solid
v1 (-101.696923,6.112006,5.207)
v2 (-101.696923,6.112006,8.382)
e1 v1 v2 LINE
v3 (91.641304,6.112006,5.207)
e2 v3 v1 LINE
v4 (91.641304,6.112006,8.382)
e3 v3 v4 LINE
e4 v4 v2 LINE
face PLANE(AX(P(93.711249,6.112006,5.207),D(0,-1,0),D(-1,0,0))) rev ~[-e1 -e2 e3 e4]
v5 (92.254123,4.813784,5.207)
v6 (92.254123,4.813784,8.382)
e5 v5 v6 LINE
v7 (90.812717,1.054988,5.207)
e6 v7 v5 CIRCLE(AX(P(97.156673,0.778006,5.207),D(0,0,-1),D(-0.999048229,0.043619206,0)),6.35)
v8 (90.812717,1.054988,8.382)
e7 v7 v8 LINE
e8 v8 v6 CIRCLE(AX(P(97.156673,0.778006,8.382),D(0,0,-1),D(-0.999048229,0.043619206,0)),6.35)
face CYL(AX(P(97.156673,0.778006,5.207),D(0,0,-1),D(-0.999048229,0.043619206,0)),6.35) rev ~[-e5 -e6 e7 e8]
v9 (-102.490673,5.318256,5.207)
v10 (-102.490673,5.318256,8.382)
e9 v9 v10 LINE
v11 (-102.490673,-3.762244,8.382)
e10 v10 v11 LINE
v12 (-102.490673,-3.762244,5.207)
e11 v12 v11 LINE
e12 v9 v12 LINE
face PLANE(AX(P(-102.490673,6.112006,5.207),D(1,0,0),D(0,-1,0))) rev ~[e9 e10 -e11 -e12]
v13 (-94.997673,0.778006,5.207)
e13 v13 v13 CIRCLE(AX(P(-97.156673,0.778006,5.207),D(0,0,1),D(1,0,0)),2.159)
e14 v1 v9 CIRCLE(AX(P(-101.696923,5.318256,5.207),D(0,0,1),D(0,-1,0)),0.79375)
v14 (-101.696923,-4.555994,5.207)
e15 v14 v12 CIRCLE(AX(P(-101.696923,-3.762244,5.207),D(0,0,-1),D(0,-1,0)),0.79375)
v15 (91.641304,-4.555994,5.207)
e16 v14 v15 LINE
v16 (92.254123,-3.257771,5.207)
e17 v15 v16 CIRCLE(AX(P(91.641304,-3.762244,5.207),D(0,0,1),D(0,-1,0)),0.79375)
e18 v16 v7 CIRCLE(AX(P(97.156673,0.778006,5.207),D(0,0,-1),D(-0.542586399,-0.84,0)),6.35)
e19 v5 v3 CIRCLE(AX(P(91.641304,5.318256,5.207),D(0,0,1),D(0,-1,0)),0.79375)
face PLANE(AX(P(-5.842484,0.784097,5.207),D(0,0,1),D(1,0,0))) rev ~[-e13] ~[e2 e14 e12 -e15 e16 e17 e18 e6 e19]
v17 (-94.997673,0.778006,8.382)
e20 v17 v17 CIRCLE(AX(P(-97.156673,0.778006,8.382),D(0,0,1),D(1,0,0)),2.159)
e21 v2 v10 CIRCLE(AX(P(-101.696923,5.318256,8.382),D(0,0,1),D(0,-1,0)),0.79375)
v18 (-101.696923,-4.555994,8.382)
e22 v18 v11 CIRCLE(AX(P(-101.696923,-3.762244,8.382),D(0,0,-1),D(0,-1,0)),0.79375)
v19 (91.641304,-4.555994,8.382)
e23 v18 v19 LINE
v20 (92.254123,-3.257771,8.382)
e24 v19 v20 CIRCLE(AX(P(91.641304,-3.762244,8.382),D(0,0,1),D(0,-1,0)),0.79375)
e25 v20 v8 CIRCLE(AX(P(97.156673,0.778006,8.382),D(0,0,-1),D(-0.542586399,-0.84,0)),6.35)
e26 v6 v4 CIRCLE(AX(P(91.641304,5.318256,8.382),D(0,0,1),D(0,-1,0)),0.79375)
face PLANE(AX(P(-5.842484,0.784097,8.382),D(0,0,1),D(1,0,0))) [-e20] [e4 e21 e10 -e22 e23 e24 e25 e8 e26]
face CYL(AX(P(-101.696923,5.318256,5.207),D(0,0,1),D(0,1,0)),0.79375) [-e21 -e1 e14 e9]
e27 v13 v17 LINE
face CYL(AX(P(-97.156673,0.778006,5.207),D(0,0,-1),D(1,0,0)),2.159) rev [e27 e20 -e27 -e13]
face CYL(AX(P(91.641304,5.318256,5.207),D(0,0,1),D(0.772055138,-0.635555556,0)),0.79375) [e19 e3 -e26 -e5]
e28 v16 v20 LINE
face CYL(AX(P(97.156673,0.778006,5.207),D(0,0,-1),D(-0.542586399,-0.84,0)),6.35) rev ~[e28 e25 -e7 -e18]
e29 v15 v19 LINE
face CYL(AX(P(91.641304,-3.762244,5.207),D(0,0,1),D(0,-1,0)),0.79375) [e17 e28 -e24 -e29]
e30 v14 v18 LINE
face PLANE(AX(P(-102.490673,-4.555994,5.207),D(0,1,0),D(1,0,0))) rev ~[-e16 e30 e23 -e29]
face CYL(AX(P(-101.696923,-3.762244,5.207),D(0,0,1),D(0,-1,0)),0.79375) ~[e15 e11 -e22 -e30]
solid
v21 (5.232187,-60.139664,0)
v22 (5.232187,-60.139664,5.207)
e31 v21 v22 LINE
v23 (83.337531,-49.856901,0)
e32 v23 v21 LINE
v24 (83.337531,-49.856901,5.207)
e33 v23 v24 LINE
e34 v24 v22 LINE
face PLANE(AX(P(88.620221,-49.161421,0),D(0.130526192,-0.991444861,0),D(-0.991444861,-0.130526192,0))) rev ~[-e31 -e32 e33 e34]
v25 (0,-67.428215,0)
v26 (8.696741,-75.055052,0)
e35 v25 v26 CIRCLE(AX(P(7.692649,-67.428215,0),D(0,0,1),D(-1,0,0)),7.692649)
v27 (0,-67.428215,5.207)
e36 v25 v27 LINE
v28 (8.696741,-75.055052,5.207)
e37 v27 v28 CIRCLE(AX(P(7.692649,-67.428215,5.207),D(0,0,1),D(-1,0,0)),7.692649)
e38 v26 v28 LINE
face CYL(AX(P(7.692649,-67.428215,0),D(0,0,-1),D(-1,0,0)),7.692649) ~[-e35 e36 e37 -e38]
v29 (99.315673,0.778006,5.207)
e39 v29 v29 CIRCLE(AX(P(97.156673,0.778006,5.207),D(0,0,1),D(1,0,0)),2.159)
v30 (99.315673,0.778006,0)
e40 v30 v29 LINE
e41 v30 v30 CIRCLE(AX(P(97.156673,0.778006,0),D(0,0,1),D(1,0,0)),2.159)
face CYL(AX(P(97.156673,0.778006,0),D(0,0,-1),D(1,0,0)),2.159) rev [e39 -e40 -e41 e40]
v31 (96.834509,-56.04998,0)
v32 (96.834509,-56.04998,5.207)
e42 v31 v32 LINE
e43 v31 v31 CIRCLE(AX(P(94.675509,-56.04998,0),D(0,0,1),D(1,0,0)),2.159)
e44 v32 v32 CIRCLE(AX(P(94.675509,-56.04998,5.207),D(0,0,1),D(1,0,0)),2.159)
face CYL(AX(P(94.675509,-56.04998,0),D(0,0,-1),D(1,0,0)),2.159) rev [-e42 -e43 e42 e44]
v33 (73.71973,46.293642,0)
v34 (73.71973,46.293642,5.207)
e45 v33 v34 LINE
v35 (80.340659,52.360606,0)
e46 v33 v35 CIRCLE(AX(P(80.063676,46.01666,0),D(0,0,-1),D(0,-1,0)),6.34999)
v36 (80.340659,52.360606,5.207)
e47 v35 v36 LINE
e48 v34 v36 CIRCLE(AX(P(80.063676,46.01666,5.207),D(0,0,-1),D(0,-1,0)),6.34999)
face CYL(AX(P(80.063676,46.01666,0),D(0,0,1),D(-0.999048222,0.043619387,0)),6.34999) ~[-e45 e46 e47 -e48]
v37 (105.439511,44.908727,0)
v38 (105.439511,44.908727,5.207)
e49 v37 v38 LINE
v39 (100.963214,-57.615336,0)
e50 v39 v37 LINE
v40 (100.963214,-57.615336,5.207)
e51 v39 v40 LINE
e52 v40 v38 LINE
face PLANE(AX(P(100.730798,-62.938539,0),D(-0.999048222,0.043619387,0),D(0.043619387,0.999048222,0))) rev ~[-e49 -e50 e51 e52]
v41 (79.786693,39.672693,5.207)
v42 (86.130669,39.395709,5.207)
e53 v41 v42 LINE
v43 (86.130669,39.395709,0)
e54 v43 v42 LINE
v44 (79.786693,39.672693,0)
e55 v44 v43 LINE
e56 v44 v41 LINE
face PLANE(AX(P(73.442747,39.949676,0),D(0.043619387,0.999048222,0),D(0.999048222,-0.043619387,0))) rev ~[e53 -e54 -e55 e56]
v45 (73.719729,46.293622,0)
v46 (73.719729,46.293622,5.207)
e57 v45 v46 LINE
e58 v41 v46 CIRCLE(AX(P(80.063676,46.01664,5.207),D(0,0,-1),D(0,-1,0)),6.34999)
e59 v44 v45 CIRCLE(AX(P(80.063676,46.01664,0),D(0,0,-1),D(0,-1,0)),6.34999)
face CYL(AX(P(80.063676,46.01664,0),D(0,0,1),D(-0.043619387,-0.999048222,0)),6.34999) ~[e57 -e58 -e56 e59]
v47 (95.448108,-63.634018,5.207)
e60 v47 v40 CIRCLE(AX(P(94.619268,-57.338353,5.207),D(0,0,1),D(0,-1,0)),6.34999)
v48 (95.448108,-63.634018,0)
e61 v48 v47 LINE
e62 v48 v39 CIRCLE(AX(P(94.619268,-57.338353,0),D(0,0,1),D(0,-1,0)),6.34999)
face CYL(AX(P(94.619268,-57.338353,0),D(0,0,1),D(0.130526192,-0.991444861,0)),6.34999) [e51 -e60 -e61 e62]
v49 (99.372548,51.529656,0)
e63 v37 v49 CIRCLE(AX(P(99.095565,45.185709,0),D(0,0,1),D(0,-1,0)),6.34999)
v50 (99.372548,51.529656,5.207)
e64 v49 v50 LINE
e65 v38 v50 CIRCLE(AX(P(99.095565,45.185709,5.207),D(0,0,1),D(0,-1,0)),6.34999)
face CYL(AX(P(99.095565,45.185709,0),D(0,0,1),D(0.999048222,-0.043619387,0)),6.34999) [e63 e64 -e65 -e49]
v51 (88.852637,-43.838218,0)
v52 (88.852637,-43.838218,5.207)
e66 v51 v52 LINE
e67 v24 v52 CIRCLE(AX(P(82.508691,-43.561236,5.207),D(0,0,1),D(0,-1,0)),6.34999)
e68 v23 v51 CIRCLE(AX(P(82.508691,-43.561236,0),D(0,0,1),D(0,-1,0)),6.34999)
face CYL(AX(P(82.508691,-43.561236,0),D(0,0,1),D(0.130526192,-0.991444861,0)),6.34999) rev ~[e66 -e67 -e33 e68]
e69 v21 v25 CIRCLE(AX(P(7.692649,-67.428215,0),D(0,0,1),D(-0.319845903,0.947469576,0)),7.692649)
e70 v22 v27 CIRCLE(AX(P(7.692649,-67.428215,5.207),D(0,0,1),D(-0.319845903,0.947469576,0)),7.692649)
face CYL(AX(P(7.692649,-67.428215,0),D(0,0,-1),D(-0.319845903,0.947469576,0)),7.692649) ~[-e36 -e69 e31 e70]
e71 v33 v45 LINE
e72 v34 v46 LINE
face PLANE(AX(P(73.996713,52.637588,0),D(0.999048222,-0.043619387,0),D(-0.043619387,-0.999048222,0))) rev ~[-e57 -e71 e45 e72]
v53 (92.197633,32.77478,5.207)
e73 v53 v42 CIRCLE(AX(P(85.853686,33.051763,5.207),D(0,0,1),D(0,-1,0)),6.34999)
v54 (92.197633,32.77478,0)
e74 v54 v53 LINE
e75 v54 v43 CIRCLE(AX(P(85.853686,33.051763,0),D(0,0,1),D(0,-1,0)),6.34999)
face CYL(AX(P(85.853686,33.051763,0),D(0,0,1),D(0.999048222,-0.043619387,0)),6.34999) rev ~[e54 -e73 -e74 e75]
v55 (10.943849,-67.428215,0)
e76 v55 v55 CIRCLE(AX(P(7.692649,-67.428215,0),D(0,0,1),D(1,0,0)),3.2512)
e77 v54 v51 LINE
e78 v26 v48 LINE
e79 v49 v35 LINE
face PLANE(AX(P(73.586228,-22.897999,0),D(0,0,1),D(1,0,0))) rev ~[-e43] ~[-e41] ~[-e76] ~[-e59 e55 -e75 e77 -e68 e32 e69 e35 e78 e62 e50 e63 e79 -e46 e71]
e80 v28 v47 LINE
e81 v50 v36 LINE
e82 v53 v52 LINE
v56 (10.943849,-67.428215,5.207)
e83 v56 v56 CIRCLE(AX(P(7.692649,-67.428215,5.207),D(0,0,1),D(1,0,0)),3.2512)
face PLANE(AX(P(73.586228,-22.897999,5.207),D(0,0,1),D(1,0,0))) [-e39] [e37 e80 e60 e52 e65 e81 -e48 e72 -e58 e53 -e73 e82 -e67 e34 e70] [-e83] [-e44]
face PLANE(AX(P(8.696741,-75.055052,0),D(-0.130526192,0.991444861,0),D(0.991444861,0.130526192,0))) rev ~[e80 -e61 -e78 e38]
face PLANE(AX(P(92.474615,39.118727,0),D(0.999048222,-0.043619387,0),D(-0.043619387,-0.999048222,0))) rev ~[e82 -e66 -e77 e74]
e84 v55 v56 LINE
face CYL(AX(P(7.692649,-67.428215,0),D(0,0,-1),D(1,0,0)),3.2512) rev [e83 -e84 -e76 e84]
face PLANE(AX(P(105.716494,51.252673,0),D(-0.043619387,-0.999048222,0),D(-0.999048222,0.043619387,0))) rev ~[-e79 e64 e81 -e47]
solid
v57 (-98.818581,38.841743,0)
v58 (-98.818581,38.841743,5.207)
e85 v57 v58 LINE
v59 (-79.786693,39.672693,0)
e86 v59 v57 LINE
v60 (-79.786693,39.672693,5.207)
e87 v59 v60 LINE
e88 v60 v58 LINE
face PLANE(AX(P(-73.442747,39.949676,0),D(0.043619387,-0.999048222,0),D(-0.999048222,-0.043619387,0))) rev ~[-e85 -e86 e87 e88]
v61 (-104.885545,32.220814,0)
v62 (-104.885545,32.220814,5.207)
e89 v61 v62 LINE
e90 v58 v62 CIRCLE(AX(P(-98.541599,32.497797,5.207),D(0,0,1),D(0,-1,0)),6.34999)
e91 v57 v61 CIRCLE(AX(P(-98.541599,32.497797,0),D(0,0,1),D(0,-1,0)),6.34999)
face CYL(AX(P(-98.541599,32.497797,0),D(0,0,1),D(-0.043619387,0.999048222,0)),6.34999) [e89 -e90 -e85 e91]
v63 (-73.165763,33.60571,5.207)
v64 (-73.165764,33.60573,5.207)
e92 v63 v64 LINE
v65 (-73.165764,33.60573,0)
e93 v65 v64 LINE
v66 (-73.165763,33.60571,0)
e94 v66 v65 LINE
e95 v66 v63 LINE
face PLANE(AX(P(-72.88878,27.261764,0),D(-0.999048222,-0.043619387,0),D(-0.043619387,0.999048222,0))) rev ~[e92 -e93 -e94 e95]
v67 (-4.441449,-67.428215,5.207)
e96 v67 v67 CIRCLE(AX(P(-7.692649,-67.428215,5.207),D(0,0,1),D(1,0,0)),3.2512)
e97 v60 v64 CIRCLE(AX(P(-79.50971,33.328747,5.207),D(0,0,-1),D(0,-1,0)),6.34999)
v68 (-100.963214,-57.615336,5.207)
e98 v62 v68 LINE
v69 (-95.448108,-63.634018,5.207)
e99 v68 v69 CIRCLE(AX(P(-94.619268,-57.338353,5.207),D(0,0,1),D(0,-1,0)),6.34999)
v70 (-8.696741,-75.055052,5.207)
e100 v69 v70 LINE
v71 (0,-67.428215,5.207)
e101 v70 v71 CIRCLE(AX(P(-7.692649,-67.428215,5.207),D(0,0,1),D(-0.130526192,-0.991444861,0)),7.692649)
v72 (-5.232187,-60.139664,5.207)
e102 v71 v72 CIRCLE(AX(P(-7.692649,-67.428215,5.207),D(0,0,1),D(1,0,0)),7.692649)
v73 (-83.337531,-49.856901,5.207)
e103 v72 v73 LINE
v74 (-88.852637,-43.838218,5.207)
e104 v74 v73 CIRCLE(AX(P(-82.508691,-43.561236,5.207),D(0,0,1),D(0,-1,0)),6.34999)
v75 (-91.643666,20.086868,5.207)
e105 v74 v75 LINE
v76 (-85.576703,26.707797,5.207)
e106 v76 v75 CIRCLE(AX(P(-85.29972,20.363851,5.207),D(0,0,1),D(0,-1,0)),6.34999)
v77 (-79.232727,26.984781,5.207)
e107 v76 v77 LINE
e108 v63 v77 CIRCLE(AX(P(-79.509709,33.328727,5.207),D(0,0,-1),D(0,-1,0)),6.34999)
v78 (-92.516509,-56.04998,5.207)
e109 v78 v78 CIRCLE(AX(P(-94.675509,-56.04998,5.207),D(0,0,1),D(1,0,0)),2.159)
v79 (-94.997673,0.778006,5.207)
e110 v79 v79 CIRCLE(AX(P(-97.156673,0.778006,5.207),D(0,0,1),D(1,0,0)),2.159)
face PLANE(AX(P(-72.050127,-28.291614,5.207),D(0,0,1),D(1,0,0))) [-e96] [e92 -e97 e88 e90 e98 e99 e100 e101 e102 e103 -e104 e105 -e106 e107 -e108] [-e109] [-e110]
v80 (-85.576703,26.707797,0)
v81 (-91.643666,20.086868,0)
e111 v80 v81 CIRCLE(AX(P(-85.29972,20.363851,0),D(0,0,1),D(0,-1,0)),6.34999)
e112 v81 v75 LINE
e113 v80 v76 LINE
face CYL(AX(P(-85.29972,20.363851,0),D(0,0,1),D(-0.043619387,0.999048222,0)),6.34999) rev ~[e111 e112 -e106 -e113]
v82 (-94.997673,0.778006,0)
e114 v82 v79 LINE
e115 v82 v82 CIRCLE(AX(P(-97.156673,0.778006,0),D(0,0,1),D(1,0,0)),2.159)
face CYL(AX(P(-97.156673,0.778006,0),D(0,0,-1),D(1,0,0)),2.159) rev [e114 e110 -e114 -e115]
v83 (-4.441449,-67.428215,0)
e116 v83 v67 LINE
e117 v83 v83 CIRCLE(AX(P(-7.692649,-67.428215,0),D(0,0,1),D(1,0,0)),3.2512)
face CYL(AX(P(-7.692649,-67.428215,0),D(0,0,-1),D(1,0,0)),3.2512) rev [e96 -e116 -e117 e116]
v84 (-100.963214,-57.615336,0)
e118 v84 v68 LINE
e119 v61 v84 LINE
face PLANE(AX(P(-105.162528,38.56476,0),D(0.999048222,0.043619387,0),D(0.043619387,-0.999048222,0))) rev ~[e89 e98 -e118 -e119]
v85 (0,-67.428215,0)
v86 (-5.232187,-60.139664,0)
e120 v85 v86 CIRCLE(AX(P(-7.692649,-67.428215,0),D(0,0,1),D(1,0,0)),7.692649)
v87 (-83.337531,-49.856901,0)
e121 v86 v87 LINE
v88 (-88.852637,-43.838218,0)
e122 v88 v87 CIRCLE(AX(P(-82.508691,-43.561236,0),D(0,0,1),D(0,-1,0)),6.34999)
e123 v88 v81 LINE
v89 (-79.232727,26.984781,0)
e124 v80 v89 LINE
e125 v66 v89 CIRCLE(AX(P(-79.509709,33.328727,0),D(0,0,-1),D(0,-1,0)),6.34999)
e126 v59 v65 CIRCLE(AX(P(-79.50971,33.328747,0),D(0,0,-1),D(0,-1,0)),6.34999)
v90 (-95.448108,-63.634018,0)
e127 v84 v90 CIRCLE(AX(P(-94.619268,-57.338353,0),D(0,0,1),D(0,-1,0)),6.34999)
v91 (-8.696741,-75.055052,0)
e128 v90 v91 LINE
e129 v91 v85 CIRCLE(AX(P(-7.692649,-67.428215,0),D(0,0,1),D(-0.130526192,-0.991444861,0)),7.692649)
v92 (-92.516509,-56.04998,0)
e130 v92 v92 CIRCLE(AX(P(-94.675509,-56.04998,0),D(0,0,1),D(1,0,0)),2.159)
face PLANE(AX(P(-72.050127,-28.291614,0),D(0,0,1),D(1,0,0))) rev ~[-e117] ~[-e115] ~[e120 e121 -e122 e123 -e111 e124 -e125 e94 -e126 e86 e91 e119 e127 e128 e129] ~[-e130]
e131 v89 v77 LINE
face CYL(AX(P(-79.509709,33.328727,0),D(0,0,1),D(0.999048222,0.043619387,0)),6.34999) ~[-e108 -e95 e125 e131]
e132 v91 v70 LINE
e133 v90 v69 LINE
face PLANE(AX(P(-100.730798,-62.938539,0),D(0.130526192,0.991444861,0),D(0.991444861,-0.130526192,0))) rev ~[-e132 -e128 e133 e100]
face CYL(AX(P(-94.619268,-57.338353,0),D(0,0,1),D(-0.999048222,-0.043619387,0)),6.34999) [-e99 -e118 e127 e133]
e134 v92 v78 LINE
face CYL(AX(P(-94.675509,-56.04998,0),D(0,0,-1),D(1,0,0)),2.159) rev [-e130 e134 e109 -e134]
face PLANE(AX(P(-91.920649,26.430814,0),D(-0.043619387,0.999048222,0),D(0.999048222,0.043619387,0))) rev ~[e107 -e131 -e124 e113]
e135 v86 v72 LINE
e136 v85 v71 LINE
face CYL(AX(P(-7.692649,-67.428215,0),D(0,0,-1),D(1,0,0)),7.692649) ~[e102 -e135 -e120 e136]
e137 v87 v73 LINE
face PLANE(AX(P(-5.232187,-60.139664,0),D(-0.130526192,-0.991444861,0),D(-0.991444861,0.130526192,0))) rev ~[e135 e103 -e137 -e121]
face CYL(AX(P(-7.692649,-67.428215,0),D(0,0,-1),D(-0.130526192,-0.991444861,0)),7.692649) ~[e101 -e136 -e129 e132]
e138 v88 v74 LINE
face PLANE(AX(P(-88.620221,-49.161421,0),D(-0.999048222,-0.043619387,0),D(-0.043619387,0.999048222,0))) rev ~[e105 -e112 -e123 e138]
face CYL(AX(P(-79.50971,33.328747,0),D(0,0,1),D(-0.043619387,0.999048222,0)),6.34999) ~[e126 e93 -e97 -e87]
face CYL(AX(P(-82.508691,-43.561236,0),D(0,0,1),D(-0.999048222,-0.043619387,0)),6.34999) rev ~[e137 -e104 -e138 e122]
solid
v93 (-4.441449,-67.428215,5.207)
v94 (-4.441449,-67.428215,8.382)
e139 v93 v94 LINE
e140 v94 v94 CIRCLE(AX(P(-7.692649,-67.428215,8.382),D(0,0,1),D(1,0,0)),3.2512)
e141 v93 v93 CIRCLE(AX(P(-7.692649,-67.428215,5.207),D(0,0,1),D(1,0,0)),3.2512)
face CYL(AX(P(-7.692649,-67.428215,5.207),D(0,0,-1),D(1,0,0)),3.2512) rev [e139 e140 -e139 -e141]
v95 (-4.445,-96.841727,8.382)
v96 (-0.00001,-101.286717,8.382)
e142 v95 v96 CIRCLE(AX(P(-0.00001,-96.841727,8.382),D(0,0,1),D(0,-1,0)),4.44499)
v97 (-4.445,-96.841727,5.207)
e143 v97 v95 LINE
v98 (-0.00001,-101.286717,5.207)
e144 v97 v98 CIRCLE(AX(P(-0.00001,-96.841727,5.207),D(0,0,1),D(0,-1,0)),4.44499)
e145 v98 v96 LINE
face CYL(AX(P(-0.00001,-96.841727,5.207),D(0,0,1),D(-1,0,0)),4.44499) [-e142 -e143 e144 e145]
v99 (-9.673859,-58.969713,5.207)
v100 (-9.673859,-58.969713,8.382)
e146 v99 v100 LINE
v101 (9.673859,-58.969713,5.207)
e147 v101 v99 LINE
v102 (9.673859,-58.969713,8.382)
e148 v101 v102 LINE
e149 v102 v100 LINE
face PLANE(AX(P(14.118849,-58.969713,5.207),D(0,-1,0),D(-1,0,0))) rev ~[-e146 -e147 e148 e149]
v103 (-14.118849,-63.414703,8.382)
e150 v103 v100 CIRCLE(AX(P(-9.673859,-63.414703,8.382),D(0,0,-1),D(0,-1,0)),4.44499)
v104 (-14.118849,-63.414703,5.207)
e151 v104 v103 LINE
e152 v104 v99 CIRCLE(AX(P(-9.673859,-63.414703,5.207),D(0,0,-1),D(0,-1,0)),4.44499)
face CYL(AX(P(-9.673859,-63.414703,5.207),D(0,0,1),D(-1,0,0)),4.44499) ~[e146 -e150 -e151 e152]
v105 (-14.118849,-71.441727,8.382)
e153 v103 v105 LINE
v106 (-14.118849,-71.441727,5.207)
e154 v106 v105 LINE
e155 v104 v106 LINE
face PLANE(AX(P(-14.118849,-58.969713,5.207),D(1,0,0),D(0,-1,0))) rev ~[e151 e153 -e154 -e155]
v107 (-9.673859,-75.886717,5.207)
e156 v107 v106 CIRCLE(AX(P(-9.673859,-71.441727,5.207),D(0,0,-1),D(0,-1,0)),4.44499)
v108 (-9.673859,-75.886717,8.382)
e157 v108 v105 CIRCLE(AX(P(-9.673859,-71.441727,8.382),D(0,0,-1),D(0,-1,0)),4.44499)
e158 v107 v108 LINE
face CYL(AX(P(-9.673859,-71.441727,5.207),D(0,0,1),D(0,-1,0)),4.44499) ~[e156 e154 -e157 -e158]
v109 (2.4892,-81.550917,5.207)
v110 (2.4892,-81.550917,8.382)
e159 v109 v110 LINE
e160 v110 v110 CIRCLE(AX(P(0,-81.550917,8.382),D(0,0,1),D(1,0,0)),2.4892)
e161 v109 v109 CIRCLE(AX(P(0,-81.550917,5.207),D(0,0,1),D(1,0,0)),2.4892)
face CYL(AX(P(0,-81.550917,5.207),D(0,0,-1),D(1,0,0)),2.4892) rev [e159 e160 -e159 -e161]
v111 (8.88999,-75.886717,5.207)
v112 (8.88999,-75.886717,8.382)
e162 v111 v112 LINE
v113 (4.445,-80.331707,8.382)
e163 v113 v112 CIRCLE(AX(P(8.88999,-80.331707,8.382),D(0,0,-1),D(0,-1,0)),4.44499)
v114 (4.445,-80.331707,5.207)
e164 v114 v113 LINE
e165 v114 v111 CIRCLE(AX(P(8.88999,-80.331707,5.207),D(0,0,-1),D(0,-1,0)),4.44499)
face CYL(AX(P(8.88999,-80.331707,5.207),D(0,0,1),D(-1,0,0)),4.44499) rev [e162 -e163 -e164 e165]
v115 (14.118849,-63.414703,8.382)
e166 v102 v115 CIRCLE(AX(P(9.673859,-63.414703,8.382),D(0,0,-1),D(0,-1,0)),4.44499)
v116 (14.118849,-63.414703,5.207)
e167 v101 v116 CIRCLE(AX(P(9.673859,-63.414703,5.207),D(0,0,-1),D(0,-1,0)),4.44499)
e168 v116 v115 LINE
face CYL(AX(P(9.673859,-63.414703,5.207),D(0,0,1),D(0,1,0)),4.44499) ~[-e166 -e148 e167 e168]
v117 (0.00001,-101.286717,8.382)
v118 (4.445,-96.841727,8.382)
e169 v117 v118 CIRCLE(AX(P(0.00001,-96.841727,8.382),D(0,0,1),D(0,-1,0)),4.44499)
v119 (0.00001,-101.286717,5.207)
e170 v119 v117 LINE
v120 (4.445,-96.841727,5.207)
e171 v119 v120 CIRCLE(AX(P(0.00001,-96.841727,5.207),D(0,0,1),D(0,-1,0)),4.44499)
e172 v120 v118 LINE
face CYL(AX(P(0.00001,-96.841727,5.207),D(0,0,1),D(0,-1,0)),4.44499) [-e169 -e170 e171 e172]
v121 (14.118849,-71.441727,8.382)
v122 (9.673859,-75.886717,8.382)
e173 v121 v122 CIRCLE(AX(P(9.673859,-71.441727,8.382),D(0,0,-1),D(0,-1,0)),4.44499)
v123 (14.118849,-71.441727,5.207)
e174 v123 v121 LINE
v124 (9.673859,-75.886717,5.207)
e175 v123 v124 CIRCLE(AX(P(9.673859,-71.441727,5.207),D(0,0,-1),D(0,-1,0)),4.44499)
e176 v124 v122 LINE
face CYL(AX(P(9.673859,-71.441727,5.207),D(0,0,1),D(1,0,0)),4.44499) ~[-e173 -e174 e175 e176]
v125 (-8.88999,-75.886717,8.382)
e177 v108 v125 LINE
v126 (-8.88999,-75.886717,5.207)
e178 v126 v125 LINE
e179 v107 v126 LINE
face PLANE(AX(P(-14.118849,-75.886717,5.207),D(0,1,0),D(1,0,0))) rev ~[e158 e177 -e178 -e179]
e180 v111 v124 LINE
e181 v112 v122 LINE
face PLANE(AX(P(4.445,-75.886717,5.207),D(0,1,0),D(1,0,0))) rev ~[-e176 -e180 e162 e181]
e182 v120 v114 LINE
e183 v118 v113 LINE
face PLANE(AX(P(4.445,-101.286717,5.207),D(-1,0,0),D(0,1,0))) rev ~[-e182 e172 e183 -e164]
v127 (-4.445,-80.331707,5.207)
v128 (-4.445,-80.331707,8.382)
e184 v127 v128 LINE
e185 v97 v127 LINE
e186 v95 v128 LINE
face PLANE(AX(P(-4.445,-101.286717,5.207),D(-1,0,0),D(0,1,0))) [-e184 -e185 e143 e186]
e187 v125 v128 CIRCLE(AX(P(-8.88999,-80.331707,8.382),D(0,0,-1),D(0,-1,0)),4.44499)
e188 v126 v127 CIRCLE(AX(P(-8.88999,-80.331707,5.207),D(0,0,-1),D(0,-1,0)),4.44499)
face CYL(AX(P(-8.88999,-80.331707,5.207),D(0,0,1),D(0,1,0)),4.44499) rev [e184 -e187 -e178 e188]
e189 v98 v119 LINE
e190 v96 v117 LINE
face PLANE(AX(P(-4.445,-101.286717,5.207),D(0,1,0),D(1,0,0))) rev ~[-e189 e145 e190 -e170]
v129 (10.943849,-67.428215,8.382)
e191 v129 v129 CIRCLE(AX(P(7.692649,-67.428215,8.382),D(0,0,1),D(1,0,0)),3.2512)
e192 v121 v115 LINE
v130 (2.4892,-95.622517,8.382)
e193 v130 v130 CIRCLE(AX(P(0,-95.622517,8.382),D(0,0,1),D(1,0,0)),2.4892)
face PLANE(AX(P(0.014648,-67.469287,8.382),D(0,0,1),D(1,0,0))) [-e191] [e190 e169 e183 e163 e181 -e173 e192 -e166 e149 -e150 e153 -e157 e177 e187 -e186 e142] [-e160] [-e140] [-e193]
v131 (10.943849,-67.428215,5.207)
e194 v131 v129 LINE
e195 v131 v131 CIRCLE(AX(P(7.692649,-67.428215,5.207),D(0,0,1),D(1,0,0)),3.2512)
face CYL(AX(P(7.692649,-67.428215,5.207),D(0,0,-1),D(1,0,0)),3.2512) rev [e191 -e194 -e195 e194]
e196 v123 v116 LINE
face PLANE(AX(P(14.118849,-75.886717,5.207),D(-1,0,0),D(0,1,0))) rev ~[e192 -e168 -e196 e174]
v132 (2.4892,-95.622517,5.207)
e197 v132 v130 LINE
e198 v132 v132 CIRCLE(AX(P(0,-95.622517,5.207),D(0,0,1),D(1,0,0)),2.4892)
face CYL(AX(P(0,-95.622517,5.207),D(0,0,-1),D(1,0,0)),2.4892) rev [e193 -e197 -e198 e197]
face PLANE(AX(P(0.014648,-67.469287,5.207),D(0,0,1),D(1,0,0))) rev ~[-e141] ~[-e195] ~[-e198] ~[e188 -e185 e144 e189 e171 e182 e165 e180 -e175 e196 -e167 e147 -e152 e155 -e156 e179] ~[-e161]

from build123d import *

# Parameters (mm, degrees)
F0_R     = 3.2512
F0_R_2   = 2.159
F1_DEPTH = 5.207
F2_R     = 3.2512
F2_W     = 8.89
F2_H     = 25.4
F2_R_2   = 2.4892
F3_DEPTH = 3.175
F4_R     = 4.44499
F5_R     = 2.159
F6_DEPTH = 3.175
F7_R     = 0.79375
F8_R     = 6.34999
F8_2_R   = 6.34999


# Not quite as in the source:
# - a fillet or chamfer is up to 0.001 mm smaller than in the source, because OpenCascade refuses the exact size


with BuildPart() as f1:
    # F0 (on Top) → F1 (new body)
    with BuildSketch(Plane.XY):
        with BuildLine():
            ThreePointArc((5.2321866987, -60.139664194), (1.4434761951, -62.9421602277), (0, -67.4282150393))
            ThreePointArc((0, -67.4282150393), (2.6205330591, -73.2118547441), (8.6967411267, -75.0550523098))
            Line((8.6967411267, -75.0550523098), (100.7307979156, -62.9385388704))
            Line((100.7307979156, -62.9385388704), (105.7164938914, 51.2526728564))
            Line((105.7164938914, 51.2526728564), (73.9967128562, 52.6375884052))
            Line((73.9967128562, 52.6375884052), (73.4427466367, 39.9496759911))
            Line((73.4427466367, 39.9496759911), (92.4746152578, 39.1187266618))
            Line((92.4746152578, 39.1187266618), (88.6202207603, -49.1614212409))
            Line((88.6202207603, -49.1614212409), (5.2321866987, -60.139664194))
        make_face()
        with Locations((7.6926489511, -67.4282150369)):
            Circle(F0_R, mode=Mode.SUBTRACT)
        with Locations((94.6755093379, -56.0499800557)):
            Circle(F0_R_2, mode=Mode.SUBTRACT)
        with Locations((97.1566728062, 0.7780063098)):
            Circle(F0_R_2, mode=Mode.SUBTRACT)
    extrude(amount=F1_DEPTH)

    # F8 (radius 6.35 in the source; OpenCascade refuses exactly that, so slightly less here)
    f8_edges = [f1.edges().sort_by_distance(p)[0] for p in [
        (92.474615, 39.118727, 2.6035),
        (73.442747, 39.949676, 2.6035),
        (73.996713, 52.637588, 2.6035),
        (105.716494, 51.252673, 2.6035),
        (100.730798, -62.938539, 2.6035),
        (88.620221, -49.161421, 2.6035),
    ]]
    fillet(f8_edges, radius=F8_R)


with BuildPart() as f1b:
    # F0 (on Top) → F1, piece 2 (new body)
    with BuildSketch(Plane.XY):
        with BuildLine():
            Line((-73.4427466367, 39.9496759911), (-105.1625276719, 38.5647604423))
            Line((-105.1625276719, 38.5647604423), (-100.7307979156, -62.9385388704))
            Line((-100.7307979156, -62.9385388704), (-8.6967411267, -75.0550523098))
            ThreePointArc((-8.6967411267, -75.0550523098), (-2.6205330591, -73.2118547441), (0, -67.4282150393))
            ThreePointArc((0, -67.4282150393), (-1.4434761951, -62.9421602277), (-5.2321866987, -60.139664194))
            Line((-5.2321866987, -60.139664194), (-88.6202207603, -49.1614212409))
            Line((-88.6202207603, -49.1614212409), (-91.9206490383, 26.4308142477))
            Line((-91.9206490383, 26.4308142477), (-72.8887804171, 27.261763577))
            Line((-72.8887804171, 27.261763577), (-73.4427466367, 39.9496759911))
        make_face()
        with Locations((-94.6755093379, -56.0499800557)):
            Circle(F0_R_2, mode=Mode.SUBTRACT)
        with Locations((-7.6926489511, -67.4282150369)):
            Circle(F0_R, mode=Mode.SUBTRACT)
        with Locations((-97.1566728062, 0.7780063098)):
            Circle(F0_R_2, mode=Mode.SUBTRACT)
    extrude(amount=F1_DEPTH)

    # F8#2 (radius 6.35 in the source; OpenCascade refuses exactly that, so slightly less here)
    f8_2_edges = [f1b.edges().sort_by_distance(p)[0] for p in [
        (-73.442747, 39.949676, 2.6035),
        (-72.88878, 27.261764, 2.6035),
        (-105.162528, 38.56476, 2.6035),
        (-91.920649, 26.430814, 2.6035),
        (-100.730798, -62.938539, 2.6035),
        (-88.620221, -49.161421, 2.6035),
    ]]
    fillet(f8_2_edges, radius=F8_2_R)


with BuildPart() as f3:
    # F2 (on face) → F3 (new body)
    with BuildSketch(Plane.XY.offset(5.207)):
        with BuildLine():
            Line((-14.1188489511, -75.8867171605), (-4.445, -75.8867171605))
            Line((-4.445, -75.8867171605), (4.445, -75.8867171605))
            Line((4.445, -75.8867171605), (14.1188489511, -75.8867171605))
            Line((14.1188489511, -75.8867171605), (14.1188489511, -58.9697129133))
            Line((14.1188489511, -58.9697129133), (-14.1188489511, -58.9697129133))
            Line((-14.1188489511, -58.9697129133), (-5.2321866987, -60.139664194))
            ThreePointArc((-5.2321866987, -60.139664194), (-0.1994884623, -69.1687304127), (-8.6967411267, -75.0550523098))
            Line((-8.6967411267, -75.0550523098), (-14.1188489511, -74.3412182725))
            Line((-14.1188489511, -74.3412182725), (-14.1188489511, -75.8867171605))
        make_face()
        with Locations((7.6926489511, -67.4282150369)):
            Circle(F2_R, mode=Mode.SUBTRACT)
        with Locations((0, -88.5867171605)):
            Rectangle(F2_W, F2_H)
        with Locations((0, -95.6225171605)):
            Circle(F2_R_2, mode=Mode.SUBTRACT)
        with Locations((0, -81.5509171605)):
            Circle(F2_R_2, mode=Mode.SUBTRACT)
        with BuildLine():
            Line((-14.1188489511, -58.9697129133), (-14.1188489511, -74.3412182725))
            Line((-14.1188489511, -74.3412182725), (-8.6967411267, -75.0550523098))
            ThreePointArc((-8.6967411267, -75.0550523098), (-0.1994884623, -69.1687304127), (-5.2321866987, -60.139664194))
            Line((-5.2321866987, -60.139664194), (-14.1188489511, -58.9697129133))
        make_face()
        with Locations((-7.6926489511, -67.4282150369)):
            Circle(F2_R, mode=Mode.SUBTRACT)
    extrude(amount=F3_DEPTH)

    # F4 (radius 4.445 in the source; OpenCascade refuses exactly that, so slightly less here)
    f4_edges = [f3.edges().sort_by_distance(p)[0] for p in [
        (-4.445, -75.886717, 6.7945),
        (-14.118849, -75.886717, 6.7945),
        (4.445, -75.886717, 6.7945),
        (14.118849, -75.886717, 6.7945),
        (14.118849, -58.969713, 6.7945),
        (-14.118849, -58.969713, 6.7945),
        (-4.445, -101.286717, 6.7945),
        (4.445, -101.286717, 6.7945),
    ]]
    fillet(f4_edges, radius=F4_R)


with BuildPart() as f6:
    # F5 (on face) → F6 (new body)
    with BuildSketch(Plane.XY.offset(5.207)):
        Polygon((90.567735786, -4.5559936902), (90.812716549, 1.0549882694), (91.0335107249, 6.1120063098), (-102.4906728062, 6.1120063098), (-102.4906728062, -4.5559936902), align=None)
        with Locations((-97.1566728062, 0.7780063098)):
            Circle(F5_R, mode=Mode.SUBTRACT)
        with BuildLine():
            ThreePointArc((93.7112491748, -4.5559936902), (91.5149736571, -2.1363942651), (90.812716549, 1.0549882694))
            Line((90.812716549, 1.0549882694), (90.567735786, -4.5559936902))
            Line((90.567735786, -4.5559936902), (93.7112491748, -4.5559936902))
        make_face()
        with BuildLine():
            ThreePointArc((90.812716549, 1.0549882694), (91.6474670997, 3.9357194829), (93.7112491748, 6.1120063098))
            Line((93.7112491748, 6.1120063098), (91.0335107249, 6.1120063098))
            Line((91.0335107249, 6.1120063098), (90.812716549, 1.0549882694))
        make_face()
    extrude(amount=F6_DEPTH)

    # F7
    f7_edges = [f6.edges().sort_by_distance(p)[0] for p in [
        (-102.490673, 6.112006, 6.7945),
        (-102.490673, -4.555994, 6.7945),
        (93.711249, 6.112006, 6.7945),
        (93.711249, -4.555994, 6.7945),
    ]]
    fillet(f7_edges, radius=F7_R)


solid = Compound([f1.part, f1b.part, f3.part, f6.part])
